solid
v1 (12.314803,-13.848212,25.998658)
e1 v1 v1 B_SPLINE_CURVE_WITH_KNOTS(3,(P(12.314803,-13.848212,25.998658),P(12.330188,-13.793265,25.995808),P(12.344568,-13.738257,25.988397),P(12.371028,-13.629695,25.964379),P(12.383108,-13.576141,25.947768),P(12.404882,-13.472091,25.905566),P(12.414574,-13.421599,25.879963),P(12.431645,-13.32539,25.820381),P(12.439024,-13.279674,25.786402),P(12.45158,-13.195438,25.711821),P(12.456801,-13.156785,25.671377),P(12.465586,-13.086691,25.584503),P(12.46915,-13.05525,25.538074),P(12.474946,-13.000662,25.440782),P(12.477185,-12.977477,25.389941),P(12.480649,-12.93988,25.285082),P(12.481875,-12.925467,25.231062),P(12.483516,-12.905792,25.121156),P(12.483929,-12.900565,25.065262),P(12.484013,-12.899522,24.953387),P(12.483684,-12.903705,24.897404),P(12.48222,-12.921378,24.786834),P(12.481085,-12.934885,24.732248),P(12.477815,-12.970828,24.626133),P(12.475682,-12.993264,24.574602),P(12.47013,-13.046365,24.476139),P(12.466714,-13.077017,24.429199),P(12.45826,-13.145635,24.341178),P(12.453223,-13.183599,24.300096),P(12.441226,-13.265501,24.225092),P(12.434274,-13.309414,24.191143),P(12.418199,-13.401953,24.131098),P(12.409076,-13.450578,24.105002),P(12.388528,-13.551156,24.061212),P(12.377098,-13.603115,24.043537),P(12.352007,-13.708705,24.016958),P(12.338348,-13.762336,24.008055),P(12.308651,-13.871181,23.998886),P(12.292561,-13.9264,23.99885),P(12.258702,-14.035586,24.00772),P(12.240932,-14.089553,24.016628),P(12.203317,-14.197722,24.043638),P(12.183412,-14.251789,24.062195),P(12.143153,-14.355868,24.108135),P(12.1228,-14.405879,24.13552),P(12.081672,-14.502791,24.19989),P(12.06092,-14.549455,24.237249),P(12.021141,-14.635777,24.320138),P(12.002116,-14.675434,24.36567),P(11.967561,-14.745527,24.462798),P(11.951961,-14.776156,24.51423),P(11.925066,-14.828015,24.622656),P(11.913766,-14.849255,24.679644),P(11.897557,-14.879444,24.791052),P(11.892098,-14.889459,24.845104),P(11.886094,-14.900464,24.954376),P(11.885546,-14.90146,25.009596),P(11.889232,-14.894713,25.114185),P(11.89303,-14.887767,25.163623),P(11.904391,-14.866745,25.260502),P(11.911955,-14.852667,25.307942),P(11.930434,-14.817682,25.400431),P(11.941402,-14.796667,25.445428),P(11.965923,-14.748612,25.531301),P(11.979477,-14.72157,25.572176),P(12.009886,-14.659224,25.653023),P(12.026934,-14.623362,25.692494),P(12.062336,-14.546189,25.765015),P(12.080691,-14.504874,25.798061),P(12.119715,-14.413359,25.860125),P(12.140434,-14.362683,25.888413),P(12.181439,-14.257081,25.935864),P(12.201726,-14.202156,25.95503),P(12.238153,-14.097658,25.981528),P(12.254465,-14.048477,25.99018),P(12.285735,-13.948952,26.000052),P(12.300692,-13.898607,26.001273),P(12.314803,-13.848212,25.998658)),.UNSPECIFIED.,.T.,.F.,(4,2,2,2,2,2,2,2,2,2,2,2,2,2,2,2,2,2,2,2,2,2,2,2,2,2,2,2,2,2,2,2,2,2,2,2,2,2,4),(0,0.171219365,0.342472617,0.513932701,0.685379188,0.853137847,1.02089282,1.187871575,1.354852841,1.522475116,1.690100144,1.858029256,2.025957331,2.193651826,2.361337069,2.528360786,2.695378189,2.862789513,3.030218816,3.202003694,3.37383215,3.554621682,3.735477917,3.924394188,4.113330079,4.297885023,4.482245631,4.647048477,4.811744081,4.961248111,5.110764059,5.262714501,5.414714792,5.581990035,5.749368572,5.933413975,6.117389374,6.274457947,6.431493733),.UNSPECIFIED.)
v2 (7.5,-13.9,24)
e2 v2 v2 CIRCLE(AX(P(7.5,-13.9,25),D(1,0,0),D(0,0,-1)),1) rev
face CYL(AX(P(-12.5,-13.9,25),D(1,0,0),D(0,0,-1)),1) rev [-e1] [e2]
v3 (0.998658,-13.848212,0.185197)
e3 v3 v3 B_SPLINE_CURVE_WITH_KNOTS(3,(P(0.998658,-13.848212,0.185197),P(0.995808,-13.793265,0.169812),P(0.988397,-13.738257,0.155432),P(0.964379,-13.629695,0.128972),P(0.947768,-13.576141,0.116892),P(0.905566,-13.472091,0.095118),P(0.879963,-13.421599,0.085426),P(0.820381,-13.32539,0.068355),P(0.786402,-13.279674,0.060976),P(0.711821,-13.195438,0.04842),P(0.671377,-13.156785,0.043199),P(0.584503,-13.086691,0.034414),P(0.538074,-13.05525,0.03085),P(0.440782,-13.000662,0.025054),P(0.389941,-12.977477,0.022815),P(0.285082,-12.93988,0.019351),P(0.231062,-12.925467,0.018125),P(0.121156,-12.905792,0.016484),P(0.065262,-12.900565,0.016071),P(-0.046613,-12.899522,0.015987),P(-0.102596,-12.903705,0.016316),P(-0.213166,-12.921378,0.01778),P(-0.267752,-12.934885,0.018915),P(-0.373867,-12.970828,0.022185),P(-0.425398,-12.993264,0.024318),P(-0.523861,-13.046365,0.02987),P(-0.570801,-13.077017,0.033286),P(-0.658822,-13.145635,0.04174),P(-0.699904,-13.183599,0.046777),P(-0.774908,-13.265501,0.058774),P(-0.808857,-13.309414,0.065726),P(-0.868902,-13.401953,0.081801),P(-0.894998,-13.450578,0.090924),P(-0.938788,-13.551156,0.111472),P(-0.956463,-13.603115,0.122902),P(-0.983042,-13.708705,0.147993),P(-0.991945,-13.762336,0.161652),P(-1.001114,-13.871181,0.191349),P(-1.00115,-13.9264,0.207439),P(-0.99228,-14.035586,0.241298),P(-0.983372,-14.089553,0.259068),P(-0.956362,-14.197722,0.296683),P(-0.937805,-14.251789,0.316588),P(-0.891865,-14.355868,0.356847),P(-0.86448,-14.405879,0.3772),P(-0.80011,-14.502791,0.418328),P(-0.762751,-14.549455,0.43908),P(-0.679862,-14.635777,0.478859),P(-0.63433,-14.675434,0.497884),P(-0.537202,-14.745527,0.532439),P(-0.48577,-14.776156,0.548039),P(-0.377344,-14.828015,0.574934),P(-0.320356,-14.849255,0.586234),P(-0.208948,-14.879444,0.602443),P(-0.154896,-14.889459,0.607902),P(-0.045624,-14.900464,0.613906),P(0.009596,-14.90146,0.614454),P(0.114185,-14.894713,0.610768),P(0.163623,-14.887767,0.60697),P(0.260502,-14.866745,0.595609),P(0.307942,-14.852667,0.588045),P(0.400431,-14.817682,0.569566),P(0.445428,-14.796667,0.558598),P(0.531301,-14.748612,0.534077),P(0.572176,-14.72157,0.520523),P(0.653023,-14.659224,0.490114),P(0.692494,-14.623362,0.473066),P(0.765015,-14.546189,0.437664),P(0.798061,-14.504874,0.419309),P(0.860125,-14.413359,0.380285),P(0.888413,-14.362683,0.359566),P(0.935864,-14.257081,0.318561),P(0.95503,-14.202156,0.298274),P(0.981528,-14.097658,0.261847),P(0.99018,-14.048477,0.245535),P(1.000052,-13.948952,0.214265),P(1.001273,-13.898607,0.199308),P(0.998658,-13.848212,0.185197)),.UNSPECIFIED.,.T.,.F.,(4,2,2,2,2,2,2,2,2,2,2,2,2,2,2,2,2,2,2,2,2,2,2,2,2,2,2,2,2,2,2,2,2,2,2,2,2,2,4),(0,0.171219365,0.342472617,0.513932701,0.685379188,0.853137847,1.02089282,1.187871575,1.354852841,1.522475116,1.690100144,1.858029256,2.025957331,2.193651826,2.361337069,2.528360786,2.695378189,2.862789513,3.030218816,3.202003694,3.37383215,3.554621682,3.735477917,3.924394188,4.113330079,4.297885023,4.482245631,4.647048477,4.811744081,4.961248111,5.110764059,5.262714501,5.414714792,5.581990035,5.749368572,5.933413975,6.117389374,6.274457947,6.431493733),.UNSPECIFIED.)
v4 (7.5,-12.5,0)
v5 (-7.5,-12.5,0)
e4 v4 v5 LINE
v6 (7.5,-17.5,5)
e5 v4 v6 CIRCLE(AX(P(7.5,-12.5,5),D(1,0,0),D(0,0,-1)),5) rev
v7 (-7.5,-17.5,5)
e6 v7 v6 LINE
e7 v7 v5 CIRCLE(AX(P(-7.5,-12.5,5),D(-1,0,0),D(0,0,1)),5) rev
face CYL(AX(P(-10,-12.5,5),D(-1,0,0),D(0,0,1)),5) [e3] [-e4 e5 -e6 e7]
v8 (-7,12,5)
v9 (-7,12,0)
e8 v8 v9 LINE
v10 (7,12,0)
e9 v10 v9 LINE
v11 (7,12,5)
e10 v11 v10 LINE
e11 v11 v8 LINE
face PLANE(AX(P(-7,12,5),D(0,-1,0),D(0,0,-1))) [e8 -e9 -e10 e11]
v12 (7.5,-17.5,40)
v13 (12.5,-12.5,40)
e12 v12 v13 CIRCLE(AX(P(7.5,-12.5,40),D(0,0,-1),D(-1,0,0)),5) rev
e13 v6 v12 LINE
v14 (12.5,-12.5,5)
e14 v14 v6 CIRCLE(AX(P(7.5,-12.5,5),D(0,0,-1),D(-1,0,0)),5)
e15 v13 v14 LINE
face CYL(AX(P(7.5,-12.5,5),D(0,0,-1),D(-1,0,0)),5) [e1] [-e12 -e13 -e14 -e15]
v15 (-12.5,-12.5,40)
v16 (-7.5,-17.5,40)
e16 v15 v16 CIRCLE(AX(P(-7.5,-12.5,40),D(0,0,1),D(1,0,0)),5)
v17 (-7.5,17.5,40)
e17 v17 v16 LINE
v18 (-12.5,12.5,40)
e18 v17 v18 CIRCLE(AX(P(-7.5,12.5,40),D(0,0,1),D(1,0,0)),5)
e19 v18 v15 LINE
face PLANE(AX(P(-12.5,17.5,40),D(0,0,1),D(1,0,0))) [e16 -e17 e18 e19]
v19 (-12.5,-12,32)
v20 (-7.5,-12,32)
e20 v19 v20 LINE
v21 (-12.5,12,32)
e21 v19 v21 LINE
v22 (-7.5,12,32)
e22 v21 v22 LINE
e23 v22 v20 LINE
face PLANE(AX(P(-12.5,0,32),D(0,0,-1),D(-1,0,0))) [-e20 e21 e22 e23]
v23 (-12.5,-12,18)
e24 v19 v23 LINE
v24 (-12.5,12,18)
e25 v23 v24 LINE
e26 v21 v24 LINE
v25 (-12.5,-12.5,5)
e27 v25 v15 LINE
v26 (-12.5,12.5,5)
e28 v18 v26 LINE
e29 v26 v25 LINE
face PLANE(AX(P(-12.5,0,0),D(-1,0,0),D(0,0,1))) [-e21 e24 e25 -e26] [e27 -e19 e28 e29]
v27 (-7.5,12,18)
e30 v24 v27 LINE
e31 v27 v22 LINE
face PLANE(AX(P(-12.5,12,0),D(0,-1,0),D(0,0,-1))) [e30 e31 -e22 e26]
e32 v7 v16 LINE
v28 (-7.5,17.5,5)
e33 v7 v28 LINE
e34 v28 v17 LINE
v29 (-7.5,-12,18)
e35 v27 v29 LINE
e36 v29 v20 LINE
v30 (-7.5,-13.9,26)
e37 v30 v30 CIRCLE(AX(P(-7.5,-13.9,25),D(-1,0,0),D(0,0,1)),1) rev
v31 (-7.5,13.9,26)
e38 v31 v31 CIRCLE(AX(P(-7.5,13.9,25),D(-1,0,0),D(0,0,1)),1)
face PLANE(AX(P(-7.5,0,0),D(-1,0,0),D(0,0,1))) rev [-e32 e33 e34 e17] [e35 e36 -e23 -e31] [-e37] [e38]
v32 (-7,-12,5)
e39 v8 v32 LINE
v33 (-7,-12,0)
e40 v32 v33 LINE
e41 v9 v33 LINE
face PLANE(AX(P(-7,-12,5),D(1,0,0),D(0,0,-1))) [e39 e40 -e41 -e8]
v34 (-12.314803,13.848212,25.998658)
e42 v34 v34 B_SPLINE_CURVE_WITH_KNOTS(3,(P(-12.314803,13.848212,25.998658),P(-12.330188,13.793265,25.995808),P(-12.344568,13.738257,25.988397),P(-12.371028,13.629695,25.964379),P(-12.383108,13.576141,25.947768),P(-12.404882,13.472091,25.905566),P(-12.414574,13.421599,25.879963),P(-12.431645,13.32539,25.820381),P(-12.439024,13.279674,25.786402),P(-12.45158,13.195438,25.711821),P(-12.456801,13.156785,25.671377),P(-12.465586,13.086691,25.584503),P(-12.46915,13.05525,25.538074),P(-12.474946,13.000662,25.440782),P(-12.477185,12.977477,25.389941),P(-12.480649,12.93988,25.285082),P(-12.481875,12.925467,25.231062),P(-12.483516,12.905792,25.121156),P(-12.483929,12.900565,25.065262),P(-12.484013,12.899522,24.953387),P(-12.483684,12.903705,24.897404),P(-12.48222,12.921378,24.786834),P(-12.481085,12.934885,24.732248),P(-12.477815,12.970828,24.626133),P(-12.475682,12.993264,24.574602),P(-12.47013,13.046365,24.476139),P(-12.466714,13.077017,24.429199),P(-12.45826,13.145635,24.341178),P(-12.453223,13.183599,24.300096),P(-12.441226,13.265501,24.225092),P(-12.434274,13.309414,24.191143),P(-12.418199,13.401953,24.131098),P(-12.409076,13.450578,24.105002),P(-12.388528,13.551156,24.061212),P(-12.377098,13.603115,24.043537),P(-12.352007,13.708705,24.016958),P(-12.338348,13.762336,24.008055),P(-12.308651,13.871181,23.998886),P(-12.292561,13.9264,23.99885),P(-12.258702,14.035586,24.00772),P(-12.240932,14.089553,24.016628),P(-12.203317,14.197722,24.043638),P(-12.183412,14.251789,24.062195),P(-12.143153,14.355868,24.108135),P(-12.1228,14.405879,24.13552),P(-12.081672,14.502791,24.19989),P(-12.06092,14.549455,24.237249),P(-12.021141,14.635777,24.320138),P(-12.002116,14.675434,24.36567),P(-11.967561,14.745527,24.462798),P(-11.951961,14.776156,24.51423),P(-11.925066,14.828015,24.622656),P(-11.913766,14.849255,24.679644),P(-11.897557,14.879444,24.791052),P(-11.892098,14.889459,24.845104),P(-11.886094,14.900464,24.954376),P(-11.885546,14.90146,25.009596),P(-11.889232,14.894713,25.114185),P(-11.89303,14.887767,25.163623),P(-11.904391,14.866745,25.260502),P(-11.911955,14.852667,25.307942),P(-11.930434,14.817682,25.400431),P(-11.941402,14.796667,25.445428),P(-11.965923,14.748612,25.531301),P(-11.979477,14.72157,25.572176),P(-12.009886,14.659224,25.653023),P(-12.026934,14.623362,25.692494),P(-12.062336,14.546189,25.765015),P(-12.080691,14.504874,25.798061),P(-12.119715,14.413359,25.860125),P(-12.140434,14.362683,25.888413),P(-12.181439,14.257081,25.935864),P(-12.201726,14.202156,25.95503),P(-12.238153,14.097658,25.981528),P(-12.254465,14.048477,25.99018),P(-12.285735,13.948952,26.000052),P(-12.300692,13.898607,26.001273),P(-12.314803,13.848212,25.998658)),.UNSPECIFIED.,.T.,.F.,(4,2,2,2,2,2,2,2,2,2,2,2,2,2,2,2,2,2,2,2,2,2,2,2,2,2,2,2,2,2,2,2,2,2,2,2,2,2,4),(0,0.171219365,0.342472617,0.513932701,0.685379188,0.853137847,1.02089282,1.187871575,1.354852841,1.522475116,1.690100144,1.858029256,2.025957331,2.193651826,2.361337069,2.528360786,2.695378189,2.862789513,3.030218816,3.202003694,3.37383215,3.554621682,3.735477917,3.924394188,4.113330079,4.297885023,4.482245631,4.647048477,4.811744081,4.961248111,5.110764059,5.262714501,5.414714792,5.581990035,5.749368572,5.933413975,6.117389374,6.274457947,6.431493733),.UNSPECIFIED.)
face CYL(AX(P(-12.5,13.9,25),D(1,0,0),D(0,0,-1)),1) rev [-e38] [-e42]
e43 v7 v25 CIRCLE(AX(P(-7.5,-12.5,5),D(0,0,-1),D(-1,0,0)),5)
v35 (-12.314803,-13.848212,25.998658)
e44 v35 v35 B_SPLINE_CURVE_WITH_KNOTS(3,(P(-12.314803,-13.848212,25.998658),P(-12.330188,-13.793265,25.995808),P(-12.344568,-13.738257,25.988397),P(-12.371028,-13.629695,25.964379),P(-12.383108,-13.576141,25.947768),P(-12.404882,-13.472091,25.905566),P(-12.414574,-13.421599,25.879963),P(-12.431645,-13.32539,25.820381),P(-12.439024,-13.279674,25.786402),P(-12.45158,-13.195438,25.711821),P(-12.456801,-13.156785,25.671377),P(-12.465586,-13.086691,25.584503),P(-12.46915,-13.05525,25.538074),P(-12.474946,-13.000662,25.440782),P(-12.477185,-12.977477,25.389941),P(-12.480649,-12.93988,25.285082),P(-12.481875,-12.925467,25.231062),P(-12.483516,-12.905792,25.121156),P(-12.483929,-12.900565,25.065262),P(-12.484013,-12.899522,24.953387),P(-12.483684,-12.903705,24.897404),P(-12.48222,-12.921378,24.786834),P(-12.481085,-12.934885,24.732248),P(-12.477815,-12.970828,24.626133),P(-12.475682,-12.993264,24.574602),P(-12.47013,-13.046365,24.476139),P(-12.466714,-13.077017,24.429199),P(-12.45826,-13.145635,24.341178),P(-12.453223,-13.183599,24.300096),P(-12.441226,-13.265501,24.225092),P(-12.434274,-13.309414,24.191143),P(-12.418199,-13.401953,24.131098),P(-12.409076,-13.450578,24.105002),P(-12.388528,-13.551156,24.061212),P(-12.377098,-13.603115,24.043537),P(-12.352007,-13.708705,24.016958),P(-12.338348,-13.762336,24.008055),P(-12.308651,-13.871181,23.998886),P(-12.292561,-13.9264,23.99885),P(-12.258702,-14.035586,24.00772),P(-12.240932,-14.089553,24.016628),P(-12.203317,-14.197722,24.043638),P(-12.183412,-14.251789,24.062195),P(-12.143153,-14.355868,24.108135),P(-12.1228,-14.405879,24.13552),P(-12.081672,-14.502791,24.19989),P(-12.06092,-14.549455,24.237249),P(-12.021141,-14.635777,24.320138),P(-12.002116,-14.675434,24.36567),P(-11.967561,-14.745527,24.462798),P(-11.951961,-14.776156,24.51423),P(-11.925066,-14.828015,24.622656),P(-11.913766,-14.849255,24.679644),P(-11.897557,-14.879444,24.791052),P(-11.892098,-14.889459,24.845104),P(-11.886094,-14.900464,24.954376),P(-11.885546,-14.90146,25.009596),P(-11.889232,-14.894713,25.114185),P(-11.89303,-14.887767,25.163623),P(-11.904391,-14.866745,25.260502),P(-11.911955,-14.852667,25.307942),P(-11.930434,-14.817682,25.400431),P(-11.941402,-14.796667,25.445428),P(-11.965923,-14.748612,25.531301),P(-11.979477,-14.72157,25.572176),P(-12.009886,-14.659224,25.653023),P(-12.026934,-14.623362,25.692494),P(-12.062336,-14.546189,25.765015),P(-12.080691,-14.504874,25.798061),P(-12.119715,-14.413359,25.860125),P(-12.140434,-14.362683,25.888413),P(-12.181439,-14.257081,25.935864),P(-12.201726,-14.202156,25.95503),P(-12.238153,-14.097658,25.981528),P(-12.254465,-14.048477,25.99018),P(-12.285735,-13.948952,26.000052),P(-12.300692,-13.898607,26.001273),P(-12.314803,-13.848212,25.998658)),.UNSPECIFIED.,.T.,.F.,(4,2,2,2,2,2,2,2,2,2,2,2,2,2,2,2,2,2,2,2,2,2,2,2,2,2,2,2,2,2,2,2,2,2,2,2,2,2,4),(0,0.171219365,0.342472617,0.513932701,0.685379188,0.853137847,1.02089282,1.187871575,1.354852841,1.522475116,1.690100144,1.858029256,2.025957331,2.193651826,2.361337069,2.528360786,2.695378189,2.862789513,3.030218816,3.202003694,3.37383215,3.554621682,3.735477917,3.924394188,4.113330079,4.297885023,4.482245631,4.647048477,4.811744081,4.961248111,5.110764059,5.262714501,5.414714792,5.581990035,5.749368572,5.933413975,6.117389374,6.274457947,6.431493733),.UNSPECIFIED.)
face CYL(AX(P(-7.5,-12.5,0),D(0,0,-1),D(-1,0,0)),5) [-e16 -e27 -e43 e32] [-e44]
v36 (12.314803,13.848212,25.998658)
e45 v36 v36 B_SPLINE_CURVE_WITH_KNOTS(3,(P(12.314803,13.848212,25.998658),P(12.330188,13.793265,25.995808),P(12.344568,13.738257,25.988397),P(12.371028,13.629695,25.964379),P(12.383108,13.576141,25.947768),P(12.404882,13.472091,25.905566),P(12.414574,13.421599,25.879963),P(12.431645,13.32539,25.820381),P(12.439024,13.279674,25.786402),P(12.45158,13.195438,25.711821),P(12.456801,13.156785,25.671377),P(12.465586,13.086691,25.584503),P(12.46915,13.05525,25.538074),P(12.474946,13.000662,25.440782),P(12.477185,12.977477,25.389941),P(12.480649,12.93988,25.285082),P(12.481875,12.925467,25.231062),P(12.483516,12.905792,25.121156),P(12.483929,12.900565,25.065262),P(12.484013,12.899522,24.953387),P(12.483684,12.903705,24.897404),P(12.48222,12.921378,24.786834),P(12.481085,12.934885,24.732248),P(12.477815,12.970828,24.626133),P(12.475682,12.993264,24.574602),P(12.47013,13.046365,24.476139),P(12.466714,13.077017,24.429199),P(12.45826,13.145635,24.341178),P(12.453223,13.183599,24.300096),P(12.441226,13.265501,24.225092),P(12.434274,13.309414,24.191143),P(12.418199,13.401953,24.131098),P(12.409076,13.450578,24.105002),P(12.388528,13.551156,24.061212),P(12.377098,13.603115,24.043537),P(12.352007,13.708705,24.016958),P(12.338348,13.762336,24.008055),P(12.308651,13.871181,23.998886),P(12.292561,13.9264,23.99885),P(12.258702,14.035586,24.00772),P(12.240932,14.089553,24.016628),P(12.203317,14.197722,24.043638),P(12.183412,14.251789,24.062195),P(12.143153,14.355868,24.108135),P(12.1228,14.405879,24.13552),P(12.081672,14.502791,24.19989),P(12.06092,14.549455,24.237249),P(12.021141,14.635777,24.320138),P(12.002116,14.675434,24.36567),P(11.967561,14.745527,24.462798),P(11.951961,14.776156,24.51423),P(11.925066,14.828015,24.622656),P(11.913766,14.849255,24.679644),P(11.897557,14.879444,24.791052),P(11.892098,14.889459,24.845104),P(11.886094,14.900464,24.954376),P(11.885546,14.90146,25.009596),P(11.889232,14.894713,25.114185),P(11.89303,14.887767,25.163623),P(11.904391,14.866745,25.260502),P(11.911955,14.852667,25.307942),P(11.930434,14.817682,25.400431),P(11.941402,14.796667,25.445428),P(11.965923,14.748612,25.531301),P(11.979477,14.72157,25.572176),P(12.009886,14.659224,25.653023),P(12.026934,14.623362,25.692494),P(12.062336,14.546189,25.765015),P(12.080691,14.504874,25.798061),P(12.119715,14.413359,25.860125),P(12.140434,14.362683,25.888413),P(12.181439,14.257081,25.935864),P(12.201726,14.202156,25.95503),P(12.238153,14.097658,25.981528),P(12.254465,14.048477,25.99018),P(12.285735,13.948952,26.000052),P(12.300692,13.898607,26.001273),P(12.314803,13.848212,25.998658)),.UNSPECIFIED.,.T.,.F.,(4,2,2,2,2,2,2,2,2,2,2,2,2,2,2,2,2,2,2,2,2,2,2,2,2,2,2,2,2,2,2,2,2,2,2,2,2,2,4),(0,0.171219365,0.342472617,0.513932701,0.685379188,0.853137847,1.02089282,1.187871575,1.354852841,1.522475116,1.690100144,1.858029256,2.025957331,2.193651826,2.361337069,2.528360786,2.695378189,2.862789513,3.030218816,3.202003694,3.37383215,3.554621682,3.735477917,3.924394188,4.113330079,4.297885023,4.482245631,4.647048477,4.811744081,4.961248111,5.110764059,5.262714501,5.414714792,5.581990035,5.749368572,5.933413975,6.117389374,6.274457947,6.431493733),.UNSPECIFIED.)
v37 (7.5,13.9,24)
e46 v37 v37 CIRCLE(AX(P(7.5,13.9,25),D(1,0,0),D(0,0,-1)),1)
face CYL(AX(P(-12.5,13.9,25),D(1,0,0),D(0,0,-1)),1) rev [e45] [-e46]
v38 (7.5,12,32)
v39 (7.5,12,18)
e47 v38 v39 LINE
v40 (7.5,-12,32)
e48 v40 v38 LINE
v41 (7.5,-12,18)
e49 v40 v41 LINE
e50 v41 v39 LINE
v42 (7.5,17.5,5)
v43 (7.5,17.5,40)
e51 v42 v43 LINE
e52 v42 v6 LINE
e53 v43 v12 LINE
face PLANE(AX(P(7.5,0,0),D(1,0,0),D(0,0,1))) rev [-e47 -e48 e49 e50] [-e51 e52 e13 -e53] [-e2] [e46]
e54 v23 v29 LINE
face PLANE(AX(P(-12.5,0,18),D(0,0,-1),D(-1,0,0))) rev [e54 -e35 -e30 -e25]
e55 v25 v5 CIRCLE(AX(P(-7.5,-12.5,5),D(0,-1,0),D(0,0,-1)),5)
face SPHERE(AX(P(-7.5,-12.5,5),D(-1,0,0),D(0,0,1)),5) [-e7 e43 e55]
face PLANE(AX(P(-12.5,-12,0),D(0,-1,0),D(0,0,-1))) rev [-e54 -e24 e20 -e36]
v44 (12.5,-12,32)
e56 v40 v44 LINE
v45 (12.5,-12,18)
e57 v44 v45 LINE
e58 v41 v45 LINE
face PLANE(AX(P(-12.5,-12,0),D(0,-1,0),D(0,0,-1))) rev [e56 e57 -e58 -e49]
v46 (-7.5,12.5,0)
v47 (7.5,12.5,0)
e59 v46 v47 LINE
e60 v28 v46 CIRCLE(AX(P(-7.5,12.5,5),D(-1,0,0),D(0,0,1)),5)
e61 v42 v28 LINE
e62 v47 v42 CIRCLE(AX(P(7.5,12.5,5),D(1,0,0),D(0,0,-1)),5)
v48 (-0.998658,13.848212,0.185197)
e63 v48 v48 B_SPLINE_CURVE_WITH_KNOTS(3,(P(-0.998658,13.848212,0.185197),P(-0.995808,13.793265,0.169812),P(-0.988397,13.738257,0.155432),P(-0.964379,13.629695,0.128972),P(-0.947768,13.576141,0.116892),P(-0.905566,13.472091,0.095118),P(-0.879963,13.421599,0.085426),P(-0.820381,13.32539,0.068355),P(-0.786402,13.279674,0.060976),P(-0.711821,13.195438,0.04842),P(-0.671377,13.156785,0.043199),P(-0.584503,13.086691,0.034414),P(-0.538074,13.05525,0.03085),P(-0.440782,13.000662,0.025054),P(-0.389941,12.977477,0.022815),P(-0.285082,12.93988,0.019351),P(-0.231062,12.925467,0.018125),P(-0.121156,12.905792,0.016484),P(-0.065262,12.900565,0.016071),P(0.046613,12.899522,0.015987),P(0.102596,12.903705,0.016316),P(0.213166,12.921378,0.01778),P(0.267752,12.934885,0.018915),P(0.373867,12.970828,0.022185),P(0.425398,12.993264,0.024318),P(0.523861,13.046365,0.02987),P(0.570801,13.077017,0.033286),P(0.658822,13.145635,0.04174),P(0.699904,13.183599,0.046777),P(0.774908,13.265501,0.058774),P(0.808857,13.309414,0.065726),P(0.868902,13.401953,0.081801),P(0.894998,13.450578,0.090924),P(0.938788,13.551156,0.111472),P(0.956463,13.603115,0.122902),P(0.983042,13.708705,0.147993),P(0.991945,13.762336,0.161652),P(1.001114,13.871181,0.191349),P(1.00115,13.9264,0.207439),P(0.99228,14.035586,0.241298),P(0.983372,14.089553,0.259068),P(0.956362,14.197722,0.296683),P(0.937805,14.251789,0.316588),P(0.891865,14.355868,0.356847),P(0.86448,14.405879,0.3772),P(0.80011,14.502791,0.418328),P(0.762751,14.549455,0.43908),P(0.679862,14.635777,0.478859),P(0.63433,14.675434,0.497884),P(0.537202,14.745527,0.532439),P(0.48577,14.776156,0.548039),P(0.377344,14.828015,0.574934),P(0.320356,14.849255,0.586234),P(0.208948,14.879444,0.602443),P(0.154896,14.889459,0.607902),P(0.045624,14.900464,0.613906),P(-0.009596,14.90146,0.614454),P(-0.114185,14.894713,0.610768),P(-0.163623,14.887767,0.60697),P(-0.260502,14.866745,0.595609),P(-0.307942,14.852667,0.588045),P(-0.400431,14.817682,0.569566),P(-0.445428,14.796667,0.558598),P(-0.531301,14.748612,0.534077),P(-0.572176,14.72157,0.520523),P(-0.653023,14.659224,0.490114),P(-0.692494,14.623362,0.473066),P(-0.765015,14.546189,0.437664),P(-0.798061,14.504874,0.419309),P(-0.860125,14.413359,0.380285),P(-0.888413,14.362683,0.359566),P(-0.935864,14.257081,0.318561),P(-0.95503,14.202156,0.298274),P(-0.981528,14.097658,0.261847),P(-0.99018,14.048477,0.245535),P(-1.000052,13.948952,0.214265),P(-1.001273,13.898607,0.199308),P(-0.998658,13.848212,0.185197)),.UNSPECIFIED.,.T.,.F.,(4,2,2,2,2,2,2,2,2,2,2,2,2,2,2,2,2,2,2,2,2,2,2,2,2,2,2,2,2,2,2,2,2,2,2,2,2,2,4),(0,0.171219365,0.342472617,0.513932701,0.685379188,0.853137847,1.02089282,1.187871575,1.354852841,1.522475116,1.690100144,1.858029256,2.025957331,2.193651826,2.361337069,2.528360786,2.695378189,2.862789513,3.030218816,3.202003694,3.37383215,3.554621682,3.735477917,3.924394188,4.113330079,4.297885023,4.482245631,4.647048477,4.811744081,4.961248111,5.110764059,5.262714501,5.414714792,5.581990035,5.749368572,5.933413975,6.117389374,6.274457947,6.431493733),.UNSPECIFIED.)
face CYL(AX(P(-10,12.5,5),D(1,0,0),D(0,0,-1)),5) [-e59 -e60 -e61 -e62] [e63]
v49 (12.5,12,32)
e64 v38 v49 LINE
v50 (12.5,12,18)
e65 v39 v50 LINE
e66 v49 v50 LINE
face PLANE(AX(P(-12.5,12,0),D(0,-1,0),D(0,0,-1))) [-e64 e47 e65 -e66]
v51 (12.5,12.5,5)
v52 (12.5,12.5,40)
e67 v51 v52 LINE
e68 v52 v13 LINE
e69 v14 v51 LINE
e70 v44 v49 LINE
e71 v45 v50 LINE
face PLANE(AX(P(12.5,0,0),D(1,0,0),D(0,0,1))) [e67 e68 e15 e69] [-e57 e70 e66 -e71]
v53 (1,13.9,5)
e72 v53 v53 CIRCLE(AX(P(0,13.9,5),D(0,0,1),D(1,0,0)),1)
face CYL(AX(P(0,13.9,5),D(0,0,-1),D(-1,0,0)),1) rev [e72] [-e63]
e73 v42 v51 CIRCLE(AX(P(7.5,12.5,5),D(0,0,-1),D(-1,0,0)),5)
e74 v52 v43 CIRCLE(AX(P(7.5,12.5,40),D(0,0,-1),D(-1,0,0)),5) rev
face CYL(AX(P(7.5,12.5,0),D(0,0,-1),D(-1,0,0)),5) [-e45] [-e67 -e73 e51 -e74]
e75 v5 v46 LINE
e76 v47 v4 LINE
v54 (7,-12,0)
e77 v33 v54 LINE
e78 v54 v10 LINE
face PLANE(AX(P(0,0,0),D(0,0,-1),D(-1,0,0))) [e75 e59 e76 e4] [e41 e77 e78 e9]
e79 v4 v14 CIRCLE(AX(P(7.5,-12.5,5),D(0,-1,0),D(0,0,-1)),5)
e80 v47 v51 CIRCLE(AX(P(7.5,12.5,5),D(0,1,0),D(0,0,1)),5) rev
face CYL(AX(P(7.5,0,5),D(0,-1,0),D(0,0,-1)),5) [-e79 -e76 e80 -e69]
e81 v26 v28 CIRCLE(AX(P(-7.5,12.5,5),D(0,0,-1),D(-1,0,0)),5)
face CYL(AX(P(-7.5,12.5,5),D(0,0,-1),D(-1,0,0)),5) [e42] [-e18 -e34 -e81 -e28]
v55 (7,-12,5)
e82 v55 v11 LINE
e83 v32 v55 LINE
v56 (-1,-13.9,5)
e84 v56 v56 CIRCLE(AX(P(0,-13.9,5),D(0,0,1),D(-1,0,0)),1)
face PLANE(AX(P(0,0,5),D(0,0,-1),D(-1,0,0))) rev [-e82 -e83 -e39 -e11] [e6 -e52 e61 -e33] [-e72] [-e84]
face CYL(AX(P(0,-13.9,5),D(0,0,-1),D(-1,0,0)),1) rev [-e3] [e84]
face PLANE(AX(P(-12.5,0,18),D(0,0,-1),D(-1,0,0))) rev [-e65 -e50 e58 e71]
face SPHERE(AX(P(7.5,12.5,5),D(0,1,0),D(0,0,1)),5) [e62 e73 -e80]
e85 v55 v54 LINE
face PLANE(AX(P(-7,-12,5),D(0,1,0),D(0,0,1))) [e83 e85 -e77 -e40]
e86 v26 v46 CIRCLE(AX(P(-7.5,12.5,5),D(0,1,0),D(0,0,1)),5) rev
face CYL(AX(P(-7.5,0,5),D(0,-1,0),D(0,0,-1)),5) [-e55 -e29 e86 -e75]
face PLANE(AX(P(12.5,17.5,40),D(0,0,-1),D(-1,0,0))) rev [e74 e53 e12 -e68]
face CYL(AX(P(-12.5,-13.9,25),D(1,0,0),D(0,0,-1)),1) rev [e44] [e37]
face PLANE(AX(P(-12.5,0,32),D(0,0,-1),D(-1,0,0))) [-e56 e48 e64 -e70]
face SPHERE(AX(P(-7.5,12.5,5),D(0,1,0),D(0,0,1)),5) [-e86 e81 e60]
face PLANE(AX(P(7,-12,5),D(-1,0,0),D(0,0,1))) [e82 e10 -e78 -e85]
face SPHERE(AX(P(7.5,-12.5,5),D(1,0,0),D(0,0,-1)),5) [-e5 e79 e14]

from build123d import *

# Parameters (mm, degrees)
SKETCH1_W               = 20
SKETCH1_H               = 35
SKETCH1_R               = 1
SKETCH1_W_2             = 14
SKETCH1_H_2             = 24
BOSS_EXTRUDE1_DEPTH     = 5
SKETCH2_W               = 40
SKETCH2_H               = 35
BOSS_EXTRUDE2_DEPTH     = 2.5
CUT_EXTRUDE3_DEPTH      = 49.023431781
CUT_EXTRUDE3_DEPTH_BACK = 49.023431781
SKETCH3_W               = 14
SKETCH3_H               = 24
SKETCH3_R               = 1
FILLET1_R               = 5


with BuildPart() as part:
    # Sketch1 → Boss-Extrude1 (new body)
    with BuildSketch(Plane.XY):
        Rectangle(SKETCH1_W, SKETCH1_H)
        with Locations((0, 13.9)):
            Circle(SKETCH1_R, mode=Mode.SUBTRACT)
        with Locations(Location((0, -13.9, 0), (0, 0, 180))):
            Circle(SKETCH1_R, mode=Mode.SUBTRACT)
        Rectangle(SKETCH1_W_2, SKETCH1_H_2, mode=Mode.SUBTRACT)
    extrude(amount=BOSS_EXTRUDE1_DEPTH)

    # Sketch2 → Boss-Extrude2 (add, symmetric)
    with BuildSketch(Plane.ZY.offset(10)):
        with Locations((20, 0)):
            Rectangle(SKETCH2_W, SKETCH2_H)
    boss_extrude2 = extrude(amount=BOSS_EXTRUDE2_DEPTH, both=True)

    # Mirror3: Boss-Extrude2 across plane
    add(boss_extrude2.mirror(Plane(origin=(0, 0, 0), x_dir=(0, 0, 1), z_dir=(1, 0, 0))))

    # Sketch3 → Cut-Extrude3 (cut, two sides: drawn at the far end of the back side and taken through both)
    with BuildSketch(Plane(origin=(-7.5, 0, 0), x_dir=(0, 0, -1), z_dir=(1, 0, 0)).offset(-CUT_EXTRUDE3_DEPTH_BACK)):
        with Locations((-25, 0)):
            Rectangle(SKETCH3_W, SKETCH3_H)
        with Locations((-25, -13.9)):
            Circle(SKETCH3_R)
        with Locations((-25, 13.9)):
            Circle(SKETCH3_R)
    extrude(amount=CUT_EXTRUDE3_DEPTH + CUT_EXTRUDE3_DEPTH_BACK, mode=Mode.SUBTRACT)

    # Fillet1
    # the kernel refuses this fillet: 5 mm, written as the material it takes off along each edge
    with BuildSketch(Plane(origin=(-7.5, -12.5, 5), x_dir=(0, 0, -1), z_dir=(0, -1, 0))) as fillet1_piece_1_section:
        Polygon((0, 0), (FILLET1_R, 0), (FILLET1_R, -FILLET1_R), (0, -FILLET1_R), align=None)
    fillet1_piece_1 = extrude(amount=FILLET1_R, mode=Mode.PRIVATE)
    fillet1_piece_1 = fillet1_piece_1 - Plane(origin=(-7.5, -12.5, 5), x_dir=(0.7071067811865475, 0, 0.7071067811865475), z_dir=(0, -1, 0)) * Sphere(FILLET1_R, mode=Mode.PRIVATE)
    add(fillet1_piece_1, mode=Mode.SUBTRACT)
    with BuildSketch(Plane(origin=(7.5, -12.5, 5), x_dir=(0, 0, -1), z_dir=(0, -1, 0))) as fillet1_piece_2_section:
        Polygon((0, 0), (FILLET1_R, 0), (FILLET1_R, FILLET1_R), (0, FILLET1_R), align=None)
    fillet1_piece_2 = extrude(amount=FILLET1_R, mode=Mode.PRIVATE)
    fillet1_piece_2 = fillet1_piece_2 - Plane(origin=(7.5, -12.5, 5), x_dir=(-0.7071067811865475, 0, 0.7071067811865475), z_dir=(0, -1, 0)) * Sphere(FILLET1_R, mode=Mode.PRIVATE)
    add(fillet1_piece_2, mode=Mode.SUBTRACT)
    with BuildSketch(Plane(origin=(-7.5, 12.5, 5), x_dir=(-1, 0, 0), z_dir=(0, 0, -1))) as fillet1_piece_3_section:
        Polygon((0, 0), (FILLET1_R, 0), (FILLET1_R, FILLET1_R), (0, FILLET1_R), align=None)
    fillet1_piece_3 = extrude(amount=FILLET1_R, mode=Mode.PRIVATE)
    fillet1_piece_3 = fillet1_piece_3 - Plane(origin=(-7.5, 12.5, 5), x_dir=(0.7071067811865475, -0.7071067811865475, 0), z_dir=(0, 0, -1)) * Sphere(FILLET1_R, mode=Mode.PRIVATE)
    add(fillet1_piece_3, mode=Mode.SUBTRACT)
    with BuildSketch(Plane(origin=(7.5, 12.5, 5), x_dir=(0, 0, -1), z_dir=(1, 0, 0))) as fillet1_piece_4_section:
        Polygon((0, 0), (FILLET1_R, 0), (FILLET1_R, FILLET1_R), (0, FILLET1_R), align=None)
    fillet1_piece_4 = extrude(amount=FILLET1_R, mode=Mode.PRIVATE)
    fillet1_piece_4 = fillet1_piece_4 - Plane(origin=(7.5, 12.5, 5), x_dir=(0, -0.7071067811865475, 0.7071067811865475), z_dir=(1, 0, 0)) * Sphere(FILLET1_R, mode=Mode.PRIVATE)
    add(fillet1_piece_4, mode=Mode.SUBTRACT)
    with BuildSketch(Plane(origin=(-7.5, -17.5, 0), x_dir=(0, 0, 1), z_dir=(1, 0, 0)), Plane(origin=(-7.5, 17.5, 0), x_dir=(0, -1, 0), z_dir=(1, 0, 0))) as fillet1_piece_5:
        with BuildLine():
            CenterArc((FILLET1_R, -FILLET1_R), FILLET1_R, 90, 90)
            Line((0, -FILLET1_R), (0, 0))
            Line((0, 0), (FILLET1_R, 0))
        make_face()
    extrude(amount=15, mode=Mode.SUBTRACT)
    with BuildSketch(Plane(origin=(-12.5, 17.5, 5), x_dir=(0, -1, 0), z_dir=(0, 0, 1)), Plane(origin=(12.5, -17.5, 52.5), x_dir=(-1, 0, 0), z_dir=(0, 0, -1))) as fillet1_piece_6:
        with BuildLine():
            CenterArc((FILLET1_R, FILLET1_R), FILLET1_R, 180, 90)
            Line((0, FILLET1_R), (0, 0))
            Line((0, 0), (FILLET1_R, 0))
        make_face()
    extrude(amount=47.5, mode=Mode.SUBTRACT)
    with BuildSketch(Plane(origin=(-12.5, -17.5, 52.5), x_dir=(1, 0, 0), z_dir=(0, 0, -1)), Plane(origin=(12.5, 17.5, 5), x_dir=(0, -1, 0), z_dir=(0, 0, 1))) as fillet1_piece_7:
        with BuildLine():
            CenterArc((FILLET1_R, -FILLET1_R), FILLET1_R, 90, 90)
            Line((0, -FILLET1_R), (0, 0))
            Line((0, 0), (FILLET1_R, 0))
        make_face()
    extrude(amount=47.5, mode=Mode.SUBTRACT)
    with BuildSketch(Plane(origin=(12.5, -12.5, 0), x_dir=(-1, 0, 0), z_dir=(0, 1, 0))) as fillet1_piece_8:
        with BuildLine():
            CenterArc((FILLET1_R, FILLET1_R), FILLET1_R, 180, 90)
            Line((0, FILLET1_R), (0, 0))
            Line((0, 0), (FILLET1_R, 0))
        make_face()
    extrude(amount=25, mode=Mode.SUBTRACT)
    with BuildSketch(Plane(origin=(-12.5, -12.5, 0), x_dir=(1, 0, 0), z_dir=(0, 1, 0))) as fillet1_piece_9:
        with BuildLine():
            CenterArc((FILLET1_R, -FILLET1_R), FILLET1_R, 90, 90)
            Line((0, -FILLET1_R), (0, 0))
            Line((0, 0), (FILLET1_R, 0))
        make_face()
    extrude(amount=25, mode=Mode.SUBTRACT)


solid = part.part
